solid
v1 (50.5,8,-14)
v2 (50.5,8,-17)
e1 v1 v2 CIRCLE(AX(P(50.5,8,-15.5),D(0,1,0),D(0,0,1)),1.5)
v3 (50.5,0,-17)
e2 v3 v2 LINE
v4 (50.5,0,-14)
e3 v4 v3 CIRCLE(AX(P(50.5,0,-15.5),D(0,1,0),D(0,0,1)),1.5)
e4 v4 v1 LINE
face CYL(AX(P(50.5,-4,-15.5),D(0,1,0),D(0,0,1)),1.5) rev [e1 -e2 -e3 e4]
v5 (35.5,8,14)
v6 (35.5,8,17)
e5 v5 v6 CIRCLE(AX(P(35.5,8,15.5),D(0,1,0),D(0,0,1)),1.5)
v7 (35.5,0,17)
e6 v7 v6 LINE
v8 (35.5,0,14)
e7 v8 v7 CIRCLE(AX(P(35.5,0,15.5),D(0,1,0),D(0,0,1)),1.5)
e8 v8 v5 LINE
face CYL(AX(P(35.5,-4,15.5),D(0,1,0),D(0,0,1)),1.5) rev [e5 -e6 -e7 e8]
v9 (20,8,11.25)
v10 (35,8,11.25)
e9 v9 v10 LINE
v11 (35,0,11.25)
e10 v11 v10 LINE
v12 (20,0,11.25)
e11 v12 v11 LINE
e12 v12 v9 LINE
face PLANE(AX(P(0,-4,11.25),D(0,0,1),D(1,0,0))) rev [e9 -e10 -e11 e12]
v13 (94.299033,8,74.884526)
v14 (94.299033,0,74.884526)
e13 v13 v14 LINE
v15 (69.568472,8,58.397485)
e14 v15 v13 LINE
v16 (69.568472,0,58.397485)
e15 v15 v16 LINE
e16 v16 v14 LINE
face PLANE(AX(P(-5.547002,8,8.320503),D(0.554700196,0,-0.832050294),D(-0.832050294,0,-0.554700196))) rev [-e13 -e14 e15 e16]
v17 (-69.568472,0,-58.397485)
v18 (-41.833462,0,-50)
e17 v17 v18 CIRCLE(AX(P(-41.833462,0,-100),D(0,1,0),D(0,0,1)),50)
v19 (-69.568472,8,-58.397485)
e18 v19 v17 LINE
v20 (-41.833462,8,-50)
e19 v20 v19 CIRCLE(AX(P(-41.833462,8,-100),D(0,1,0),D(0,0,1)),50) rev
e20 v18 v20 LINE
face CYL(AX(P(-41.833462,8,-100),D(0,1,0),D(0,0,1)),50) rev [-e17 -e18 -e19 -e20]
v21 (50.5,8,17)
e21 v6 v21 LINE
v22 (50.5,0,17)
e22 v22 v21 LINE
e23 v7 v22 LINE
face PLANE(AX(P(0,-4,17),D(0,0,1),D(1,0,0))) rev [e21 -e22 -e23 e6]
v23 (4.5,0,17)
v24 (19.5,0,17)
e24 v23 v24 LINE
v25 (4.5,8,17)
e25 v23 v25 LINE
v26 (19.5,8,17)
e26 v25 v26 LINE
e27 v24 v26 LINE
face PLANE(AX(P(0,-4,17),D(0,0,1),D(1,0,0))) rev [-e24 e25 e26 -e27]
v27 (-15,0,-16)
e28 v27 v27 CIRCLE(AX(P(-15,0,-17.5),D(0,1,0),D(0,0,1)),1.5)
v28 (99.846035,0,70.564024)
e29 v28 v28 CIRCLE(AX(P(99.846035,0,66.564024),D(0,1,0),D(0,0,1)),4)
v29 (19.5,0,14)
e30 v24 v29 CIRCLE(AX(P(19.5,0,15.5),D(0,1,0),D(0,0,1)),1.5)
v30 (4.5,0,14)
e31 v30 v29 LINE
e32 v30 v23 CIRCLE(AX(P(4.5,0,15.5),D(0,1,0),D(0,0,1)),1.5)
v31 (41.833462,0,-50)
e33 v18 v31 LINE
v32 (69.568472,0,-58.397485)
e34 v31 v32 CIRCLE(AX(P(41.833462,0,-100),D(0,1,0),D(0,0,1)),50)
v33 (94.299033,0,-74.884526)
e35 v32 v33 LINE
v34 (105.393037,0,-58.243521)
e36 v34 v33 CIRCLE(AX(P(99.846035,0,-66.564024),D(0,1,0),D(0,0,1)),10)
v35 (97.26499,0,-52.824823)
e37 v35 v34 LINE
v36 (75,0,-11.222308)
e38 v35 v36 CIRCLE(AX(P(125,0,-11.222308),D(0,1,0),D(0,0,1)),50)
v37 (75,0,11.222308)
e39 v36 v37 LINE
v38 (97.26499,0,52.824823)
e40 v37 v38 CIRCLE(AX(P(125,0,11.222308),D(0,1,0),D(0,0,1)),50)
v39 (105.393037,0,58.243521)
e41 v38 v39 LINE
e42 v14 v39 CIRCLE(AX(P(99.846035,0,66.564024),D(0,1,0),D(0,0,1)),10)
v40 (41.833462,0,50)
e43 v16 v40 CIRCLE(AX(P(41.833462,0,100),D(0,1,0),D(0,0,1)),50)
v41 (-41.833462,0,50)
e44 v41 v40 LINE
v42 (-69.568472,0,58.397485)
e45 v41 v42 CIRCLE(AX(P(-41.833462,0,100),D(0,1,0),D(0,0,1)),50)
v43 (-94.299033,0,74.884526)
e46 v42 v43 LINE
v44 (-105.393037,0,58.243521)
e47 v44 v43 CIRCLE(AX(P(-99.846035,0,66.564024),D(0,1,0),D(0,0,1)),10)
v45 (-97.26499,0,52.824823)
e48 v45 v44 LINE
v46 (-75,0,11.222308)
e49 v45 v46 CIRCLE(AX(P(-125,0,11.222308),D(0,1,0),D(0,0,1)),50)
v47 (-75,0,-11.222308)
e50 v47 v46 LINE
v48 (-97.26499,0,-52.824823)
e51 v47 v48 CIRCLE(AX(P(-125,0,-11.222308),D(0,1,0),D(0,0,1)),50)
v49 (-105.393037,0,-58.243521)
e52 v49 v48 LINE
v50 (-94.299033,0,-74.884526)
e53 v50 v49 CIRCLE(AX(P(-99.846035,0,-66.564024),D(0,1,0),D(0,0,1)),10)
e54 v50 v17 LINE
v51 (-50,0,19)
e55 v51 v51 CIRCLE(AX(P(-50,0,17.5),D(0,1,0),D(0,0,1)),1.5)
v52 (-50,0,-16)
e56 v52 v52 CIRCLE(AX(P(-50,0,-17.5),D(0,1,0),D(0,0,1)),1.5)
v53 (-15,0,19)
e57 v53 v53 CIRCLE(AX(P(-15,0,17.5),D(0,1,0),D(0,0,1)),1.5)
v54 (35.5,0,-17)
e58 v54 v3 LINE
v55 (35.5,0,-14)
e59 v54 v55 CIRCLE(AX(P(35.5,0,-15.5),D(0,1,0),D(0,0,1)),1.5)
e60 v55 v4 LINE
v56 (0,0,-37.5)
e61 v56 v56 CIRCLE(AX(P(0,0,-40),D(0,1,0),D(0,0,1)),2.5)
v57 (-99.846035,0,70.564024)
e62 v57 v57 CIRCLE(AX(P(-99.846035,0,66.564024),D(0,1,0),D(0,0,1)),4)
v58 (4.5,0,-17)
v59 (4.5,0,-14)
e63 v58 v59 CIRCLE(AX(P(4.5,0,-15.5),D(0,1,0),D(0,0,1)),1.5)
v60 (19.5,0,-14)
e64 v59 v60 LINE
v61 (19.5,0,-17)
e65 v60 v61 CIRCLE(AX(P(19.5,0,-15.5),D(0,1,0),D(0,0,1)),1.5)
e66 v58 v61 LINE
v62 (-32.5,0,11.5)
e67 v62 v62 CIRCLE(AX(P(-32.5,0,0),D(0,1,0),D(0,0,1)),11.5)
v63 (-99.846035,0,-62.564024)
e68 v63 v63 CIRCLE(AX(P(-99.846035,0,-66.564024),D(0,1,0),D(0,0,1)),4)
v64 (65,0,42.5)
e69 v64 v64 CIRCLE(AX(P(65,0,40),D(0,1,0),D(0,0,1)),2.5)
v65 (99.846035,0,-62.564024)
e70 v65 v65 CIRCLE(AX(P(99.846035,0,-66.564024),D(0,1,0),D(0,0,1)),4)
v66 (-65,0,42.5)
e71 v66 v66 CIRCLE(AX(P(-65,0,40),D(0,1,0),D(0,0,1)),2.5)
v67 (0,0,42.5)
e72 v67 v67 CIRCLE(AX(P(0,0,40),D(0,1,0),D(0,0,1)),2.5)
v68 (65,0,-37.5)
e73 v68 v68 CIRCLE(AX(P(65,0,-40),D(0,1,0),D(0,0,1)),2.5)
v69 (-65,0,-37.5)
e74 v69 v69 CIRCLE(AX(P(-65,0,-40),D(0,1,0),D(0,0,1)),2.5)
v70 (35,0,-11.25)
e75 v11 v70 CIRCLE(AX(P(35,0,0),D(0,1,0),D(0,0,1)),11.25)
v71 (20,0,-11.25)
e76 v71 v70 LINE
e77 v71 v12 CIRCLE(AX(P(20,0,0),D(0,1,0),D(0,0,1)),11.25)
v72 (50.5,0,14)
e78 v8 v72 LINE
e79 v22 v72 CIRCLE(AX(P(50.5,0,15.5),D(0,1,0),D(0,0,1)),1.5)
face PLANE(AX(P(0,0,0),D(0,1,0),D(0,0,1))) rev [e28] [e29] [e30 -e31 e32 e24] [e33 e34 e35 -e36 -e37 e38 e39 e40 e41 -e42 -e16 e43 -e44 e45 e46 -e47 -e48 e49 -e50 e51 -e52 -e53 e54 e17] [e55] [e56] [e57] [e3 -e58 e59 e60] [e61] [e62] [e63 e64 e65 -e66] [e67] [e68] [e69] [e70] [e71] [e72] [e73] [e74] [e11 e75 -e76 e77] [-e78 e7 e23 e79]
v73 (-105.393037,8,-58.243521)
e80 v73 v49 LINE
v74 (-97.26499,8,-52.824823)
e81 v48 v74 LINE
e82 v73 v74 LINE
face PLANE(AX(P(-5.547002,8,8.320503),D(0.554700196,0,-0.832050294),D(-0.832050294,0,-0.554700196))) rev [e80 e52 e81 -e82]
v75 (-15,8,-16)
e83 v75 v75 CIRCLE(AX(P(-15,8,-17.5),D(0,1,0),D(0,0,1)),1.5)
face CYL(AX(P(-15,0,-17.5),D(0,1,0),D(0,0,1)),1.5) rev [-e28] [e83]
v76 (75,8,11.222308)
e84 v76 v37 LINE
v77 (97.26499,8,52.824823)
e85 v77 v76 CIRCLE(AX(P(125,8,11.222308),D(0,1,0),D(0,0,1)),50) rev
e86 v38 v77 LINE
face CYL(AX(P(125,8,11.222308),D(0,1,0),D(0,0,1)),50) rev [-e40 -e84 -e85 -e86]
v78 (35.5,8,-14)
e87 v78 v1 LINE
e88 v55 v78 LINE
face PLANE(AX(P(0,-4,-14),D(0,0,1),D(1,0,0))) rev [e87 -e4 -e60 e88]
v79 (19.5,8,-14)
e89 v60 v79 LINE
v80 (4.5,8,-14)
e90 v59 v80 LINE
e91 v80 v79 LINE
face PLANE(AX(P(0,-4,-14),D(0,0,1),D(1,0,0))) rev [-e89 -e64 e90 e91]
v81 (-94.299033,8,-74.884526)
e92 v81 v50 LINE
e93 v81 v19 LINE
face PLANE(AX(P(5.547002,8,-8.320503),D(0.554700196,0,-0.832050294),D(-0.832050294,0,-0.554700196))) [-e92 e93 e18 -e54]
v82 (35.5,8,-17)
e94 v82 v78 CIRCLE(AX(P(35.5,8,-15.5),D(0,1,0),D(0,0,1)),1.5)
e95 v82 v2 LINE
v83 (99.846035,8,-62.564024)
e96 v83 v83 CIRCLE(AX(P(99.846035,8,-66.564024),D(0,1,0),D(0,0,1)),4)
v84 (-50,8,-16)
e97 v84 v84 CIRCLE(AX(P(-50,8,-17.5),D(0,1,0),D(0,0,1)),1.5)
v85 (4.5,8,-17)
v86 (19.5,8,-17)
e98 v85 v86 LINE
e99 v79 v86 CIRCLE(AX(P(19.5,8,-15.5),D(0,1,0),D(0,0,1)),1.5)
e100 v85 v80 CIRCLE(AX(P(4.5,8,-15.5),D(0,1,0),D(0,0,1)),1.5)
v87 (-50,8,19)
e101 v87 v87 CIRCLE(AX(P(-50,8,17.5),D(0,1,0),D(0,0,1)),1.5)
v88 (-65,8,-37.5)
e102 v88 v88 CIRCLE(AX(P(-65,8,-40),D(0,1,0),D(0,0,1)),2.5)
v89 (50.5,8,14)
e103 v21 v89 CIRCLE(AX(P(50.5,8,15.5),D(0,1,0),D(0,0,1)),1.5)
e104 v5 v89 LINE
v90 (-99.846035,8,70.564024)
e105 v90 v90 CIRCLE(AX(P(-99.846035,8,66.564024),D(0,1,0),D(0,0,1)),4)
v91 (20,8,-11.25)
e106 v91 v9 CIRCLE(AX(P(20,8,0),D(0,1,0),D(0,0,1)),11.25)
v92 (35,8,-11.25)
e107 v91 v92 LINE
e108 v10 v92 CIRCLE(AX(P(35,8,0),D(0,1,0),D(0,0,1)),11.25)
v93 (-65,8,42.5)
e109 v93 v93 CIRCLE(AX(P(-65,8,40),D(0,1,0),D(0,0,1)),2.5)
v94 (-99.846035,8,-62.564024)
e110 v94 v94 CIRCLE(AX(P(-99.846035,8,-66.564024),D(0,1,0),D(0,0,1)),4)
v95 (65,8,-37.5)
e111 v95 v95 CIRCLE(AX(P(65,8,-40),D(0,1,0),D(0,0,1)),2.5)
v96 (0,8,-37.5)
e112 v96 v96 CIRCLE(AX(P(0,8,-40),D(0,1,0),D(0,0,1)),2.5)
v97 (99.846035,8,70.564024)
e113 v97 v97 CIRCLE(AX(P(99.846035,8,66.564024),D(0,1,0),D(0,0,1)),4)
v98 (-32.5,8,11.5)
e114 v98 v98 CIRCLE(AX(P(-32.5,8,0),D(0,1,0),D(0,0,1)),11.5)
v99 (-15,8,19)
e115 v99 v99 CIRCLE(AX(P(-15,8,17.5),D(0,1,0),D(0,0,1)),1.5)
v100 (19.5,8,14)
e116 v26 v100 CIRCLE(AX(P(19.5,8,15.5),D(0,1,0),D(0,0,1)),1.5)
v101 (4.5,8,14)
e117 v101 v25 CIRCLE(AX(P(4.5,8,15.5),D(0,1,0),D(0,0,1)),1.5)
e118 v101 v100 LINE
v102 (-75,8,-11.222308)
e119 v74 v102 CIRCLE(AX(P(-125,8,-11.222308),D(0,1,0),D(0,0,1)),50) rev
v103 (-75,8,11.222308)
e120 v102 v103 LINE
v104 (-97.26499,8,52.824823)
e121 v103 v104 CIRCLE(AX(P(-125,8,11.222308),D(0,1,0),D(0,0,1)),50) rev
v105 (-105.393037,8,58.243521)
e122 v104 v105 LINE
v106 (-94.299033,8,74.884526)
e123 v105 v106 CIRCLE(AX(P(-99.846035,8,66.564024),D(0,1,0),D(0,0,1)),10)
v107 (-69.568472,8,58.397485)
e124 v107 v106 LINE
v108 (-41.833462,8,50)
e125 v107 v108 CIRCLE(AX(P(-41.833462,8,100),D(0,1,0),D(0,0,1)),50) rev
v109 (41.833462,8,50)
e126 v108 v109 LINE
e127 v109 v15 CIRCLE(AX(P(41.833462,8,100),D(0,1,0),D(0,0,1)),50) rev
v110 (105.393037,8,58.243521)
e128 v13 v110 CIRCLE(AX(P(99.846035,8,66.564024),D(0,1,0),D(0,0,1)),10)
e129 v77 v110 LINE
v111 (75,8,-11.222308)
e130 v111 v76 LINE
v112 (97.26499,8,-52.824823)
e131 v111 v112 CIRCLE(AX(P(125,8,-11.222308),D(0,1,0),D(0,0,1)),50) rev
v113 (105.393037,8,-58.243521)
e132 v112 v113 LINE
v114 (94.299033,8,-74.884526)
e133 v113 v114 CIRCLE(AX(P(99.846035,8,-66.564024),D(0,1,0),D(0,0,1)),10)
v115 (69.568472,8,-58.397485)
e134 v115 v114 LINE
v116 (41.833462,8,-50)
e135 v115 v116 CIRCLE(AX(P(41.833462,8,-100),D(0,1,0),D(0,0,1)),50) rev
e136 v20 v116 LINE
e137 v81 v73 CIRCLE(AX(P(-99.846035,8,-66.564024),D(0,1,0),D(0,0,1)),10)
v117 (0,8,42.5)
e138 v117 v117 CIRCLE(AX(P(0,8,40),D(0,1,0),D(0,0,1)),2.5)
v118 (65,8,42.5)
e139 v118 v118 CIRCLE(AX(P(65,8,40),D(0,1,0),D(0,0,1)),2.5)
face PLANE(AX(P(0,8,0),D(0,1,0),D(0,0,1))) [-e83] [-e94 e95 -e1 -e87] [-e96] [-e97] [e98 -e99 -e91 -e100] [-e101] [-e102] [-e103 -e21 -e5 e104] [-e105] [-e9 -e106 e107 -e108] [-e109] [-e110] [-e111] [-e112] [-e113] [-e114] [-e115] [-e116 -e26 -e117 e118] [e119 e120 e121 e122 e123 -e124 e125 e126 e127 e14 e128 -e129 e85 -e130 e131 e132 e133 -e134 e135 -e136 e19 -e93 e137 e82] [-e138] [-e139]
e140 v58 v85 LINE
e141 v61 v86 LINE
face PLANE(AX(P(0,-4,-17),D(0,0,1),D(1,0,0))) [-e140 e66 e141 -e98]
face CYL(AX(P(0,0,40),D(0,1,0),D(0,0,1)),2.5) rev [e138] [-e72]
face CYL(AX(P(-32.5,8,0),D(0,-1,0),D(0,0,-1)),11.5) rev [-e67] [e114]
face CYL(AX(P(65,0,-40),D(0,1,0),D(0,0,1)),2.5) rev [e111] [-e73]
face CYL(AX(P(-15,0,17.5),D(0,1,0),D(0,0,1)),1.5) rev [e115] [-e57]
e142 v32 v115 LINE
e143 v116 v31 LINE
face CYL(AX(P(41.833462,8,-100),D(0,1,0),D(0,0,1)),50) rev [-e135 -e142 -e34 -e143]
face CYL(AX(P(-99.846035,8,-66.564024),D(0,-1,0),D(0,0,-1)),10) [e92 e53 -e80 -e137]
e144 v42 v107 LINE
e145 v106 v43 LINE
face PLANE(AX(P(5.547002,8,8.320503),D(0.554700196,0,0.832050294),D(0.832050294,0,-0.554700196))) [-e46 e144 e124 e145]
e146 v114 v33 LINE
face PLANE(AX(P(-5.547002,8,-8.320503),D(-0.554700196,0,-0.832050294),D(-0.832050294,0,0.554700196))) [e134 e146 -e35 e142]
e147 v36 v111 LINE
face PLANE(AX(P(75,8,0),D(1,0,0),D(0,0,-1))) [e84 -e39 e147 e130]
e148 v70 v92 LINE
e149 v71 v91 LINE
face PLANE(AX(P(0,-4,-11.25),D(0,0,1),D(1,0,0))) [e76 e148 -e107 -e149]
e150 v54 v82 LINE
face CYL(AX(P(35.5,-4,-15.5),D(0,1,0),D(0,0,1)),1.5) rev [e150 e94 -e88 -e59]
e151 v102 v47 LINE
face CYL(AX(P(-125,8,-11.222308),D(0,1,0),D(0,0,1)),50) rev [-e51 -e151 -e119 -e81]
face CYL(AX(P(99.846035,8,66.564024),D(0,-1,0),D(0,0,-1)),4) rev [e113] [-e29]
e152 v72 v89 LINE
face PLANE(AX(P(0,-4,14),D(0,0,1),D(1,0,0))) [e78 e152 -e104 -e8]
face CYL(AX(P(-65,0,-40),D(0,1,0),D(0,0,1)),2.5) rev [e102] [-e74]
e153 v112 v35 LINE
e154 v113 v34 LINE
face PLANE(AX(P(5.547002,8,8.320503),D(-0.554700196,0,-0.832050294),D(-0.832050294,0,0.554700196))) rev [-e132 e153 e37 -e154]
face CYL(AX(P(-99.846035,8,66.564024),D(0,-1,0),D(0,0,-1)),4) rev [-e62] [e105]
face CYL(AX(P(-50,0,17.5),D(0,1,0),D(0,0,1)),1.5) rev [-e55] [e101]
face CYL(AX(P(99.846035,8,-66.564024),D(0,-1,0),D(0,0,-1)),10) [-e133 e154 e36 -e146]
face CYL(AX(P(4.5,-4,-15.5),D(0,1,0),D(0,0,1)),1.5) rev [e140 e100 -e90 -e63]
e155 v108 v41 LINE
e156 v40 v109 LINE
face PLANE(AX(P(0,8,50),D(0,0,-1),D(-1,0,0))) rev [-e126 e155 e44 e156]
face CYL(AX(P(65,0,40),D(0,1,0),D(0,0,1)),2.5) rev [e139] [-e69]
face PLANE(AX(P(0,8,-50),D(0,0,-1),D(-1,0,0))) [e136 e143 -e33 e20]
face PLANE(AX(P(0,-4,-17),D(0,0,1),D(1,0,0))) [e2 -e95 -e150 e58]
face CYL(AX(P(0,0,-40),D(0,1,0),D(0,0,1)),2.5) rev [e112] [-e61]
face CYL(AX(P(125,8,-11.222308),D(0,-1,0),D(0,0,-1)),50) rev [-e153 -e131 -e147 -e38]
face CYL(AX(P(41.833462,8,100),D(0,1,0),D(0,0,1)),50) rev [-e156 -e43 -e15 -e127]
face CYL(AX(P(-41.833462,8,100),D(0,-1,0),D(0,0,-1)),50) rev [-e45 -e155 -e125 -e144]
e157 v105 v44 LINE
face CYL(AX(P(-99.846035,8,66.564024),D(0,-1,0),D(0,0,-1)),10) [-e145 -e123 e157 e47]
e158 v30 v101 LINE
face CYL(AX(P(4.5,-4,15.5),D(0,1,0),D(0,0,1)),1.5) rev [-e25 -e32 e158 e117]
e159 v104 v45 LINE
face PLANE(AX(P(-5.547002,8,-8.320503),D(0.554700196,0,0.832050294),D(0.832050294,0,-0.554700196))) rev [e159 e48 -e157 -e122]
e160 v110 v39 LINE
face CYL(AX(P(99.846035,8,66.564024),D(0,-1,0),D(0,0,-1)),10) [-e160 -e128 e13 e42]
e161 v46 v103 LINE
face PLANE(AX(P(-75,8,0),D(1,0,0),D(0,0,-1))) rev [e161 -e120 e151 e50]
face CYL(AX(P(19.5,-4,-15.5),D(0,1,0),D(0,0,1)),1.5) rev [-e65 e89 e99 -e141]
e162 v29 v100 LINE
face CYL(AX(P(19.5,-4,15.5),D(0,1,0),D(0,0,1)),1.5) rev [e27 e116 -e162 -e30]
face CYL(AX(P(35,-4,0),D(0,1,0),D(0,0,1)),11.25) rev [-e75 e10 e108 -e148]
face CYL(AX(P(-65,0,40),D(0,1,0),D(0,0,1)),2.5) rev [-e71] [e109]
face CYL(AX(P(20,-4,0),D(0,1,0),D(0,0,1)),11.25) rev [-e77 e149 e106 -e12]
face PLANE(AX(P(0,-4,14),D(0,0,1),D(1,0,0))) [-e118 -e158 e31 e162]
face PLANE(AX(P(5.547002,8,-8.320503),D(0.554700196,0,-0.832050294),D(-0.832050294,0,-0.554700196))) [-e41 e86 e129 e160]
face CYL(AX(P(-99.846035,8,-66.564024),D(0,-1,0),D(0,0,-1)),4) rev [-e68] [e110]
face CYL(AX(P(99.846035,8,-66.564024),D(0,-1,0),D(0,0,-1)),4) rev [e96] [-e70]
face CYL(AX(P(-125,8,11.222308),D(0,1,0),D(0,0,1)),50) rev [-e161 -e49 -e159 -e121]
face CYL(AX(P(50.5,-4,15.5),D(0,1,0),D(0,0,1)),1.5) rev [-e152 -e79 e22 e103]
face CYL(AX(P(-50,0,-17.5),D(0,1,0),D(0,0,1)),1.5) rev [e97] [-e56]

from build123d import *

# Parameters (mm, degrees)
SKETCH1_R           = 4
SKETCH1_R_2         = 11.5
BOSS_EXTRUDE1_DEPTH = 8
SKETCH2_R           = 2.5
SKETCH2_R_2         = 1.5
CUT_EXTRUDE1_DEPTH  = 8
FILLET1_R           = 50
FILLET2_R           = 50
CUT_EXTRUDE2_START  = -8
CUT_EXTRUDE2_DEPTH  = 8


# Read off the part's stored shape, not the designer's step: Cut-Extrude2
with BuildPart() as part:
    # Sketch1 → Boss-Extrude1 (new body)
    with BuildSketch(Plane(origin=(0, 0, 0), x_dir=(1, 0, 0), z_dir=(0, 1, 0))):
        with BuildLine():
            Line((105.393037283, -58.243520604), (75, -37.981495748))
            Line((75, -37.981495748), (75, 37.981495748))
            Line((75, 37.981495748), (105.393037283, 58.243520604))
            ThreePointArc((105.393037283, 58.243520604), (108.166538264, 72.111025509), (94.299033358, 74.88452649))
            Line((94.299033358, 74.88452649), (56.972243623, 50))
            Line((56.972243623, 50), (-56.972243623, 50))
            Line((-56.972243623, 50), (-94.299033358, 74.88452649))
            ThreePointArc((-94.299033358, 74.88452649), (-108.166538264, 72.111025509), (-105.393037283, 58.243520604))
            Line((-105.393037283, 58.243520604), (-75, 37.981495748))
            Line((-75, 37.981495748), (-75, -37.981495748))
            Line((-75, -37.981495748), (-105.393037283, -58.243520604))
            ThreePointArc((-105.393037283, -58.243520604), (-108.166538264, -72.111025509), (-94.299033358, -74.88452649))
            Line((-94.299033358, -74.88452649), (-56.972243623, -50))
            Line((-56.972243623, -50), (56.972243623, -50))
            Line((56.972243623, -50), (94.299033358, -74.88452649))
            ThreePointArc((94.299033358, -74.88452649), (108.166538264, -72.111025509), (105.393037283, -58.243520604))
        make_face()
        with Locations(Location((-99.846035321, -66.564023547, 0), (0, 0, 270))):
            Circle(SKETCH1_R, mode=Mode.SUBTRACT)
        with Locations(Location((-32.5, 0, 0), (0, 0, 270))):
            Circle(SKETCH1_R_2, mode=Mode.SUBTRACT)
        with Locations(Location((99.846035321, -66.564023547, 0), (0, 0, 270))):
            Circle(SKETCH1_R, mode=Mode.SUBTRACT)
        with Locations(Location((-99.846035321, 66.564023547, 0), (0, 0, 270))):
            Circle(SKETCH1_R, mode=Mode.SUBTRACT)
        with Locations(Location((99.846035321, 66.564023547, 0), (0, 0, 270))):
            Circle(SKETCH1_R, mode=Mode.SUBTRACT)
    extrude(amount=BOSS_EXTRUDE1_DEPTH)

    # Sketch2 → Cut-Extrude1 (cut)
    with BuildSketch(Plane(origin=(0, 8, 0), x_dir=(1, 0, 0), z_dir=(0, 1, 0))):
        with Locations(Location((-65, 40, 0), (0, 0, 270))):
            Circle(SKETCH2_R)
        with Locations(Location((65, 40, 0), (0, 0, 270))):
            Circle(SKETCH2_R)
        with Locations(Location((65, -40, 0), (0, 0, 270))):
            Circle(SKETCH2_R)
        with Locations(Location((-65, -40, 0), (0, 0, 270))):
            Circle(SKETCH2_R)
        with Locations(Location((0, -40, 0), (0, 0, 270))):
            Circle(SKETCH2_R)
        with Locations(Location((0, 40, 0), (0, 0, 270))):
            Circle(SKETCH2_R)
        with Locations(Location((-15, 17.5, 0), (0, 0, 270))):
            Circle(SKETCH2_R_2)
        with Locations(Location((-50, 17.5, 0), (0, 0, 270))):
            Circle(SKETCH2_R_2)
        with Locations(Location((-50, -17.5, 0), (0, 0, 270))):
            Circle(SKETCH2_R_2)
        with Locations(Location((-15, -17.5, 0), (0, 0, 270))):
            Circle(SKETCH2_R_2)
    extrude(amount=-CUT_EXTRUDE1_DEPTH, mode=Mode.SUBTRACT)

    # Fillet1
    fillet1_edges = [part.edges().sort_by_distance(p)[0] for p in [
        (-56.972243623, 4, -50),
        (56.972243623, 4, -50),
        (56.972243623, 4, 50),
        (-56.972243623, 4, 50),
    ]]
    fillet(fillet1_edges, radius=FILLET1_R)

    # Fillet2
    fillet2_edges = [part.edges().sort_by_distance(p)[0] for p in [
        (75, 4, -37.981495748),
        (75, 4, 37.981495748),
        (-75, 4, 37.981495748),
        (-75, 4, -37.981495748),
    ]]
    fillet(fillet2_edges, radius=FILLET2_R)

    # Cut-Extrude2 outline → Cut-Extrude2 (cut)
    with BuildSketch(Plane(origin=(0, 8, 0), x_dir=(1, 0, 0), z_dir=(0, 1, 0)).offset(CUT_EXTRUDE2_START)):
        with BuildLine():
            Line((35, 11.25), (20, 11.25))
            ThreePointArc((20, 11.25), (8.75, 0), (20, -11.25))
            Line((20, -11.25), (35, -11.25))
            ThreePointArc((35, -11.25), (46.25, 0), (35, 11.25))
        make_face()
        with BuildLine():
            ThreePointArc((35.5, 17), (34, 15.5), (35.5, 14))
            Line((35.5, 14), (50.5, 14))
            ThreePointArc((50.5, 14), (52, 15.5), (50.5, 17))
            Line((50.5, 17), (35.5, 17))
        make_face()
        with BuildLine():
            ThreePointArc((4.5, 17), (3, 15.5), (4.5, 14))
            Line((4.5, 14), (19.5, 14))
            ThreePointArc((19.5, 14), (21, 15.5), (19.5, 17))
            Line((19.5, 17), (4.5, 17))
        make_face()
        with BuildLine():
            ThreePointArc((4.5, -14), (3, -15.5), (4.5, -17))
            Line((4.5, -17), (19.5, -17))
            ThreePointArc((19.5, -17), (21, -15.5), (19.5, -14))
            Line((19.5, -14), (4.5, -14))
        make_face()
        with BuildLine():
            ThreePointArc((35.5, -14), (34, -15.5), (35.5, -17))
            Line((35.5, -17), (50.5, -17))
            ThreePointArc((50.5, -17), (52, -15.5), (50.5, -14))
            Line((50.5, -14), (35.5, -14))
        make_face()
    extrude(amount=CUT_EXTRUDE2_DEPTH, mode=Mode.SUBTRACT)


solid = part.part
